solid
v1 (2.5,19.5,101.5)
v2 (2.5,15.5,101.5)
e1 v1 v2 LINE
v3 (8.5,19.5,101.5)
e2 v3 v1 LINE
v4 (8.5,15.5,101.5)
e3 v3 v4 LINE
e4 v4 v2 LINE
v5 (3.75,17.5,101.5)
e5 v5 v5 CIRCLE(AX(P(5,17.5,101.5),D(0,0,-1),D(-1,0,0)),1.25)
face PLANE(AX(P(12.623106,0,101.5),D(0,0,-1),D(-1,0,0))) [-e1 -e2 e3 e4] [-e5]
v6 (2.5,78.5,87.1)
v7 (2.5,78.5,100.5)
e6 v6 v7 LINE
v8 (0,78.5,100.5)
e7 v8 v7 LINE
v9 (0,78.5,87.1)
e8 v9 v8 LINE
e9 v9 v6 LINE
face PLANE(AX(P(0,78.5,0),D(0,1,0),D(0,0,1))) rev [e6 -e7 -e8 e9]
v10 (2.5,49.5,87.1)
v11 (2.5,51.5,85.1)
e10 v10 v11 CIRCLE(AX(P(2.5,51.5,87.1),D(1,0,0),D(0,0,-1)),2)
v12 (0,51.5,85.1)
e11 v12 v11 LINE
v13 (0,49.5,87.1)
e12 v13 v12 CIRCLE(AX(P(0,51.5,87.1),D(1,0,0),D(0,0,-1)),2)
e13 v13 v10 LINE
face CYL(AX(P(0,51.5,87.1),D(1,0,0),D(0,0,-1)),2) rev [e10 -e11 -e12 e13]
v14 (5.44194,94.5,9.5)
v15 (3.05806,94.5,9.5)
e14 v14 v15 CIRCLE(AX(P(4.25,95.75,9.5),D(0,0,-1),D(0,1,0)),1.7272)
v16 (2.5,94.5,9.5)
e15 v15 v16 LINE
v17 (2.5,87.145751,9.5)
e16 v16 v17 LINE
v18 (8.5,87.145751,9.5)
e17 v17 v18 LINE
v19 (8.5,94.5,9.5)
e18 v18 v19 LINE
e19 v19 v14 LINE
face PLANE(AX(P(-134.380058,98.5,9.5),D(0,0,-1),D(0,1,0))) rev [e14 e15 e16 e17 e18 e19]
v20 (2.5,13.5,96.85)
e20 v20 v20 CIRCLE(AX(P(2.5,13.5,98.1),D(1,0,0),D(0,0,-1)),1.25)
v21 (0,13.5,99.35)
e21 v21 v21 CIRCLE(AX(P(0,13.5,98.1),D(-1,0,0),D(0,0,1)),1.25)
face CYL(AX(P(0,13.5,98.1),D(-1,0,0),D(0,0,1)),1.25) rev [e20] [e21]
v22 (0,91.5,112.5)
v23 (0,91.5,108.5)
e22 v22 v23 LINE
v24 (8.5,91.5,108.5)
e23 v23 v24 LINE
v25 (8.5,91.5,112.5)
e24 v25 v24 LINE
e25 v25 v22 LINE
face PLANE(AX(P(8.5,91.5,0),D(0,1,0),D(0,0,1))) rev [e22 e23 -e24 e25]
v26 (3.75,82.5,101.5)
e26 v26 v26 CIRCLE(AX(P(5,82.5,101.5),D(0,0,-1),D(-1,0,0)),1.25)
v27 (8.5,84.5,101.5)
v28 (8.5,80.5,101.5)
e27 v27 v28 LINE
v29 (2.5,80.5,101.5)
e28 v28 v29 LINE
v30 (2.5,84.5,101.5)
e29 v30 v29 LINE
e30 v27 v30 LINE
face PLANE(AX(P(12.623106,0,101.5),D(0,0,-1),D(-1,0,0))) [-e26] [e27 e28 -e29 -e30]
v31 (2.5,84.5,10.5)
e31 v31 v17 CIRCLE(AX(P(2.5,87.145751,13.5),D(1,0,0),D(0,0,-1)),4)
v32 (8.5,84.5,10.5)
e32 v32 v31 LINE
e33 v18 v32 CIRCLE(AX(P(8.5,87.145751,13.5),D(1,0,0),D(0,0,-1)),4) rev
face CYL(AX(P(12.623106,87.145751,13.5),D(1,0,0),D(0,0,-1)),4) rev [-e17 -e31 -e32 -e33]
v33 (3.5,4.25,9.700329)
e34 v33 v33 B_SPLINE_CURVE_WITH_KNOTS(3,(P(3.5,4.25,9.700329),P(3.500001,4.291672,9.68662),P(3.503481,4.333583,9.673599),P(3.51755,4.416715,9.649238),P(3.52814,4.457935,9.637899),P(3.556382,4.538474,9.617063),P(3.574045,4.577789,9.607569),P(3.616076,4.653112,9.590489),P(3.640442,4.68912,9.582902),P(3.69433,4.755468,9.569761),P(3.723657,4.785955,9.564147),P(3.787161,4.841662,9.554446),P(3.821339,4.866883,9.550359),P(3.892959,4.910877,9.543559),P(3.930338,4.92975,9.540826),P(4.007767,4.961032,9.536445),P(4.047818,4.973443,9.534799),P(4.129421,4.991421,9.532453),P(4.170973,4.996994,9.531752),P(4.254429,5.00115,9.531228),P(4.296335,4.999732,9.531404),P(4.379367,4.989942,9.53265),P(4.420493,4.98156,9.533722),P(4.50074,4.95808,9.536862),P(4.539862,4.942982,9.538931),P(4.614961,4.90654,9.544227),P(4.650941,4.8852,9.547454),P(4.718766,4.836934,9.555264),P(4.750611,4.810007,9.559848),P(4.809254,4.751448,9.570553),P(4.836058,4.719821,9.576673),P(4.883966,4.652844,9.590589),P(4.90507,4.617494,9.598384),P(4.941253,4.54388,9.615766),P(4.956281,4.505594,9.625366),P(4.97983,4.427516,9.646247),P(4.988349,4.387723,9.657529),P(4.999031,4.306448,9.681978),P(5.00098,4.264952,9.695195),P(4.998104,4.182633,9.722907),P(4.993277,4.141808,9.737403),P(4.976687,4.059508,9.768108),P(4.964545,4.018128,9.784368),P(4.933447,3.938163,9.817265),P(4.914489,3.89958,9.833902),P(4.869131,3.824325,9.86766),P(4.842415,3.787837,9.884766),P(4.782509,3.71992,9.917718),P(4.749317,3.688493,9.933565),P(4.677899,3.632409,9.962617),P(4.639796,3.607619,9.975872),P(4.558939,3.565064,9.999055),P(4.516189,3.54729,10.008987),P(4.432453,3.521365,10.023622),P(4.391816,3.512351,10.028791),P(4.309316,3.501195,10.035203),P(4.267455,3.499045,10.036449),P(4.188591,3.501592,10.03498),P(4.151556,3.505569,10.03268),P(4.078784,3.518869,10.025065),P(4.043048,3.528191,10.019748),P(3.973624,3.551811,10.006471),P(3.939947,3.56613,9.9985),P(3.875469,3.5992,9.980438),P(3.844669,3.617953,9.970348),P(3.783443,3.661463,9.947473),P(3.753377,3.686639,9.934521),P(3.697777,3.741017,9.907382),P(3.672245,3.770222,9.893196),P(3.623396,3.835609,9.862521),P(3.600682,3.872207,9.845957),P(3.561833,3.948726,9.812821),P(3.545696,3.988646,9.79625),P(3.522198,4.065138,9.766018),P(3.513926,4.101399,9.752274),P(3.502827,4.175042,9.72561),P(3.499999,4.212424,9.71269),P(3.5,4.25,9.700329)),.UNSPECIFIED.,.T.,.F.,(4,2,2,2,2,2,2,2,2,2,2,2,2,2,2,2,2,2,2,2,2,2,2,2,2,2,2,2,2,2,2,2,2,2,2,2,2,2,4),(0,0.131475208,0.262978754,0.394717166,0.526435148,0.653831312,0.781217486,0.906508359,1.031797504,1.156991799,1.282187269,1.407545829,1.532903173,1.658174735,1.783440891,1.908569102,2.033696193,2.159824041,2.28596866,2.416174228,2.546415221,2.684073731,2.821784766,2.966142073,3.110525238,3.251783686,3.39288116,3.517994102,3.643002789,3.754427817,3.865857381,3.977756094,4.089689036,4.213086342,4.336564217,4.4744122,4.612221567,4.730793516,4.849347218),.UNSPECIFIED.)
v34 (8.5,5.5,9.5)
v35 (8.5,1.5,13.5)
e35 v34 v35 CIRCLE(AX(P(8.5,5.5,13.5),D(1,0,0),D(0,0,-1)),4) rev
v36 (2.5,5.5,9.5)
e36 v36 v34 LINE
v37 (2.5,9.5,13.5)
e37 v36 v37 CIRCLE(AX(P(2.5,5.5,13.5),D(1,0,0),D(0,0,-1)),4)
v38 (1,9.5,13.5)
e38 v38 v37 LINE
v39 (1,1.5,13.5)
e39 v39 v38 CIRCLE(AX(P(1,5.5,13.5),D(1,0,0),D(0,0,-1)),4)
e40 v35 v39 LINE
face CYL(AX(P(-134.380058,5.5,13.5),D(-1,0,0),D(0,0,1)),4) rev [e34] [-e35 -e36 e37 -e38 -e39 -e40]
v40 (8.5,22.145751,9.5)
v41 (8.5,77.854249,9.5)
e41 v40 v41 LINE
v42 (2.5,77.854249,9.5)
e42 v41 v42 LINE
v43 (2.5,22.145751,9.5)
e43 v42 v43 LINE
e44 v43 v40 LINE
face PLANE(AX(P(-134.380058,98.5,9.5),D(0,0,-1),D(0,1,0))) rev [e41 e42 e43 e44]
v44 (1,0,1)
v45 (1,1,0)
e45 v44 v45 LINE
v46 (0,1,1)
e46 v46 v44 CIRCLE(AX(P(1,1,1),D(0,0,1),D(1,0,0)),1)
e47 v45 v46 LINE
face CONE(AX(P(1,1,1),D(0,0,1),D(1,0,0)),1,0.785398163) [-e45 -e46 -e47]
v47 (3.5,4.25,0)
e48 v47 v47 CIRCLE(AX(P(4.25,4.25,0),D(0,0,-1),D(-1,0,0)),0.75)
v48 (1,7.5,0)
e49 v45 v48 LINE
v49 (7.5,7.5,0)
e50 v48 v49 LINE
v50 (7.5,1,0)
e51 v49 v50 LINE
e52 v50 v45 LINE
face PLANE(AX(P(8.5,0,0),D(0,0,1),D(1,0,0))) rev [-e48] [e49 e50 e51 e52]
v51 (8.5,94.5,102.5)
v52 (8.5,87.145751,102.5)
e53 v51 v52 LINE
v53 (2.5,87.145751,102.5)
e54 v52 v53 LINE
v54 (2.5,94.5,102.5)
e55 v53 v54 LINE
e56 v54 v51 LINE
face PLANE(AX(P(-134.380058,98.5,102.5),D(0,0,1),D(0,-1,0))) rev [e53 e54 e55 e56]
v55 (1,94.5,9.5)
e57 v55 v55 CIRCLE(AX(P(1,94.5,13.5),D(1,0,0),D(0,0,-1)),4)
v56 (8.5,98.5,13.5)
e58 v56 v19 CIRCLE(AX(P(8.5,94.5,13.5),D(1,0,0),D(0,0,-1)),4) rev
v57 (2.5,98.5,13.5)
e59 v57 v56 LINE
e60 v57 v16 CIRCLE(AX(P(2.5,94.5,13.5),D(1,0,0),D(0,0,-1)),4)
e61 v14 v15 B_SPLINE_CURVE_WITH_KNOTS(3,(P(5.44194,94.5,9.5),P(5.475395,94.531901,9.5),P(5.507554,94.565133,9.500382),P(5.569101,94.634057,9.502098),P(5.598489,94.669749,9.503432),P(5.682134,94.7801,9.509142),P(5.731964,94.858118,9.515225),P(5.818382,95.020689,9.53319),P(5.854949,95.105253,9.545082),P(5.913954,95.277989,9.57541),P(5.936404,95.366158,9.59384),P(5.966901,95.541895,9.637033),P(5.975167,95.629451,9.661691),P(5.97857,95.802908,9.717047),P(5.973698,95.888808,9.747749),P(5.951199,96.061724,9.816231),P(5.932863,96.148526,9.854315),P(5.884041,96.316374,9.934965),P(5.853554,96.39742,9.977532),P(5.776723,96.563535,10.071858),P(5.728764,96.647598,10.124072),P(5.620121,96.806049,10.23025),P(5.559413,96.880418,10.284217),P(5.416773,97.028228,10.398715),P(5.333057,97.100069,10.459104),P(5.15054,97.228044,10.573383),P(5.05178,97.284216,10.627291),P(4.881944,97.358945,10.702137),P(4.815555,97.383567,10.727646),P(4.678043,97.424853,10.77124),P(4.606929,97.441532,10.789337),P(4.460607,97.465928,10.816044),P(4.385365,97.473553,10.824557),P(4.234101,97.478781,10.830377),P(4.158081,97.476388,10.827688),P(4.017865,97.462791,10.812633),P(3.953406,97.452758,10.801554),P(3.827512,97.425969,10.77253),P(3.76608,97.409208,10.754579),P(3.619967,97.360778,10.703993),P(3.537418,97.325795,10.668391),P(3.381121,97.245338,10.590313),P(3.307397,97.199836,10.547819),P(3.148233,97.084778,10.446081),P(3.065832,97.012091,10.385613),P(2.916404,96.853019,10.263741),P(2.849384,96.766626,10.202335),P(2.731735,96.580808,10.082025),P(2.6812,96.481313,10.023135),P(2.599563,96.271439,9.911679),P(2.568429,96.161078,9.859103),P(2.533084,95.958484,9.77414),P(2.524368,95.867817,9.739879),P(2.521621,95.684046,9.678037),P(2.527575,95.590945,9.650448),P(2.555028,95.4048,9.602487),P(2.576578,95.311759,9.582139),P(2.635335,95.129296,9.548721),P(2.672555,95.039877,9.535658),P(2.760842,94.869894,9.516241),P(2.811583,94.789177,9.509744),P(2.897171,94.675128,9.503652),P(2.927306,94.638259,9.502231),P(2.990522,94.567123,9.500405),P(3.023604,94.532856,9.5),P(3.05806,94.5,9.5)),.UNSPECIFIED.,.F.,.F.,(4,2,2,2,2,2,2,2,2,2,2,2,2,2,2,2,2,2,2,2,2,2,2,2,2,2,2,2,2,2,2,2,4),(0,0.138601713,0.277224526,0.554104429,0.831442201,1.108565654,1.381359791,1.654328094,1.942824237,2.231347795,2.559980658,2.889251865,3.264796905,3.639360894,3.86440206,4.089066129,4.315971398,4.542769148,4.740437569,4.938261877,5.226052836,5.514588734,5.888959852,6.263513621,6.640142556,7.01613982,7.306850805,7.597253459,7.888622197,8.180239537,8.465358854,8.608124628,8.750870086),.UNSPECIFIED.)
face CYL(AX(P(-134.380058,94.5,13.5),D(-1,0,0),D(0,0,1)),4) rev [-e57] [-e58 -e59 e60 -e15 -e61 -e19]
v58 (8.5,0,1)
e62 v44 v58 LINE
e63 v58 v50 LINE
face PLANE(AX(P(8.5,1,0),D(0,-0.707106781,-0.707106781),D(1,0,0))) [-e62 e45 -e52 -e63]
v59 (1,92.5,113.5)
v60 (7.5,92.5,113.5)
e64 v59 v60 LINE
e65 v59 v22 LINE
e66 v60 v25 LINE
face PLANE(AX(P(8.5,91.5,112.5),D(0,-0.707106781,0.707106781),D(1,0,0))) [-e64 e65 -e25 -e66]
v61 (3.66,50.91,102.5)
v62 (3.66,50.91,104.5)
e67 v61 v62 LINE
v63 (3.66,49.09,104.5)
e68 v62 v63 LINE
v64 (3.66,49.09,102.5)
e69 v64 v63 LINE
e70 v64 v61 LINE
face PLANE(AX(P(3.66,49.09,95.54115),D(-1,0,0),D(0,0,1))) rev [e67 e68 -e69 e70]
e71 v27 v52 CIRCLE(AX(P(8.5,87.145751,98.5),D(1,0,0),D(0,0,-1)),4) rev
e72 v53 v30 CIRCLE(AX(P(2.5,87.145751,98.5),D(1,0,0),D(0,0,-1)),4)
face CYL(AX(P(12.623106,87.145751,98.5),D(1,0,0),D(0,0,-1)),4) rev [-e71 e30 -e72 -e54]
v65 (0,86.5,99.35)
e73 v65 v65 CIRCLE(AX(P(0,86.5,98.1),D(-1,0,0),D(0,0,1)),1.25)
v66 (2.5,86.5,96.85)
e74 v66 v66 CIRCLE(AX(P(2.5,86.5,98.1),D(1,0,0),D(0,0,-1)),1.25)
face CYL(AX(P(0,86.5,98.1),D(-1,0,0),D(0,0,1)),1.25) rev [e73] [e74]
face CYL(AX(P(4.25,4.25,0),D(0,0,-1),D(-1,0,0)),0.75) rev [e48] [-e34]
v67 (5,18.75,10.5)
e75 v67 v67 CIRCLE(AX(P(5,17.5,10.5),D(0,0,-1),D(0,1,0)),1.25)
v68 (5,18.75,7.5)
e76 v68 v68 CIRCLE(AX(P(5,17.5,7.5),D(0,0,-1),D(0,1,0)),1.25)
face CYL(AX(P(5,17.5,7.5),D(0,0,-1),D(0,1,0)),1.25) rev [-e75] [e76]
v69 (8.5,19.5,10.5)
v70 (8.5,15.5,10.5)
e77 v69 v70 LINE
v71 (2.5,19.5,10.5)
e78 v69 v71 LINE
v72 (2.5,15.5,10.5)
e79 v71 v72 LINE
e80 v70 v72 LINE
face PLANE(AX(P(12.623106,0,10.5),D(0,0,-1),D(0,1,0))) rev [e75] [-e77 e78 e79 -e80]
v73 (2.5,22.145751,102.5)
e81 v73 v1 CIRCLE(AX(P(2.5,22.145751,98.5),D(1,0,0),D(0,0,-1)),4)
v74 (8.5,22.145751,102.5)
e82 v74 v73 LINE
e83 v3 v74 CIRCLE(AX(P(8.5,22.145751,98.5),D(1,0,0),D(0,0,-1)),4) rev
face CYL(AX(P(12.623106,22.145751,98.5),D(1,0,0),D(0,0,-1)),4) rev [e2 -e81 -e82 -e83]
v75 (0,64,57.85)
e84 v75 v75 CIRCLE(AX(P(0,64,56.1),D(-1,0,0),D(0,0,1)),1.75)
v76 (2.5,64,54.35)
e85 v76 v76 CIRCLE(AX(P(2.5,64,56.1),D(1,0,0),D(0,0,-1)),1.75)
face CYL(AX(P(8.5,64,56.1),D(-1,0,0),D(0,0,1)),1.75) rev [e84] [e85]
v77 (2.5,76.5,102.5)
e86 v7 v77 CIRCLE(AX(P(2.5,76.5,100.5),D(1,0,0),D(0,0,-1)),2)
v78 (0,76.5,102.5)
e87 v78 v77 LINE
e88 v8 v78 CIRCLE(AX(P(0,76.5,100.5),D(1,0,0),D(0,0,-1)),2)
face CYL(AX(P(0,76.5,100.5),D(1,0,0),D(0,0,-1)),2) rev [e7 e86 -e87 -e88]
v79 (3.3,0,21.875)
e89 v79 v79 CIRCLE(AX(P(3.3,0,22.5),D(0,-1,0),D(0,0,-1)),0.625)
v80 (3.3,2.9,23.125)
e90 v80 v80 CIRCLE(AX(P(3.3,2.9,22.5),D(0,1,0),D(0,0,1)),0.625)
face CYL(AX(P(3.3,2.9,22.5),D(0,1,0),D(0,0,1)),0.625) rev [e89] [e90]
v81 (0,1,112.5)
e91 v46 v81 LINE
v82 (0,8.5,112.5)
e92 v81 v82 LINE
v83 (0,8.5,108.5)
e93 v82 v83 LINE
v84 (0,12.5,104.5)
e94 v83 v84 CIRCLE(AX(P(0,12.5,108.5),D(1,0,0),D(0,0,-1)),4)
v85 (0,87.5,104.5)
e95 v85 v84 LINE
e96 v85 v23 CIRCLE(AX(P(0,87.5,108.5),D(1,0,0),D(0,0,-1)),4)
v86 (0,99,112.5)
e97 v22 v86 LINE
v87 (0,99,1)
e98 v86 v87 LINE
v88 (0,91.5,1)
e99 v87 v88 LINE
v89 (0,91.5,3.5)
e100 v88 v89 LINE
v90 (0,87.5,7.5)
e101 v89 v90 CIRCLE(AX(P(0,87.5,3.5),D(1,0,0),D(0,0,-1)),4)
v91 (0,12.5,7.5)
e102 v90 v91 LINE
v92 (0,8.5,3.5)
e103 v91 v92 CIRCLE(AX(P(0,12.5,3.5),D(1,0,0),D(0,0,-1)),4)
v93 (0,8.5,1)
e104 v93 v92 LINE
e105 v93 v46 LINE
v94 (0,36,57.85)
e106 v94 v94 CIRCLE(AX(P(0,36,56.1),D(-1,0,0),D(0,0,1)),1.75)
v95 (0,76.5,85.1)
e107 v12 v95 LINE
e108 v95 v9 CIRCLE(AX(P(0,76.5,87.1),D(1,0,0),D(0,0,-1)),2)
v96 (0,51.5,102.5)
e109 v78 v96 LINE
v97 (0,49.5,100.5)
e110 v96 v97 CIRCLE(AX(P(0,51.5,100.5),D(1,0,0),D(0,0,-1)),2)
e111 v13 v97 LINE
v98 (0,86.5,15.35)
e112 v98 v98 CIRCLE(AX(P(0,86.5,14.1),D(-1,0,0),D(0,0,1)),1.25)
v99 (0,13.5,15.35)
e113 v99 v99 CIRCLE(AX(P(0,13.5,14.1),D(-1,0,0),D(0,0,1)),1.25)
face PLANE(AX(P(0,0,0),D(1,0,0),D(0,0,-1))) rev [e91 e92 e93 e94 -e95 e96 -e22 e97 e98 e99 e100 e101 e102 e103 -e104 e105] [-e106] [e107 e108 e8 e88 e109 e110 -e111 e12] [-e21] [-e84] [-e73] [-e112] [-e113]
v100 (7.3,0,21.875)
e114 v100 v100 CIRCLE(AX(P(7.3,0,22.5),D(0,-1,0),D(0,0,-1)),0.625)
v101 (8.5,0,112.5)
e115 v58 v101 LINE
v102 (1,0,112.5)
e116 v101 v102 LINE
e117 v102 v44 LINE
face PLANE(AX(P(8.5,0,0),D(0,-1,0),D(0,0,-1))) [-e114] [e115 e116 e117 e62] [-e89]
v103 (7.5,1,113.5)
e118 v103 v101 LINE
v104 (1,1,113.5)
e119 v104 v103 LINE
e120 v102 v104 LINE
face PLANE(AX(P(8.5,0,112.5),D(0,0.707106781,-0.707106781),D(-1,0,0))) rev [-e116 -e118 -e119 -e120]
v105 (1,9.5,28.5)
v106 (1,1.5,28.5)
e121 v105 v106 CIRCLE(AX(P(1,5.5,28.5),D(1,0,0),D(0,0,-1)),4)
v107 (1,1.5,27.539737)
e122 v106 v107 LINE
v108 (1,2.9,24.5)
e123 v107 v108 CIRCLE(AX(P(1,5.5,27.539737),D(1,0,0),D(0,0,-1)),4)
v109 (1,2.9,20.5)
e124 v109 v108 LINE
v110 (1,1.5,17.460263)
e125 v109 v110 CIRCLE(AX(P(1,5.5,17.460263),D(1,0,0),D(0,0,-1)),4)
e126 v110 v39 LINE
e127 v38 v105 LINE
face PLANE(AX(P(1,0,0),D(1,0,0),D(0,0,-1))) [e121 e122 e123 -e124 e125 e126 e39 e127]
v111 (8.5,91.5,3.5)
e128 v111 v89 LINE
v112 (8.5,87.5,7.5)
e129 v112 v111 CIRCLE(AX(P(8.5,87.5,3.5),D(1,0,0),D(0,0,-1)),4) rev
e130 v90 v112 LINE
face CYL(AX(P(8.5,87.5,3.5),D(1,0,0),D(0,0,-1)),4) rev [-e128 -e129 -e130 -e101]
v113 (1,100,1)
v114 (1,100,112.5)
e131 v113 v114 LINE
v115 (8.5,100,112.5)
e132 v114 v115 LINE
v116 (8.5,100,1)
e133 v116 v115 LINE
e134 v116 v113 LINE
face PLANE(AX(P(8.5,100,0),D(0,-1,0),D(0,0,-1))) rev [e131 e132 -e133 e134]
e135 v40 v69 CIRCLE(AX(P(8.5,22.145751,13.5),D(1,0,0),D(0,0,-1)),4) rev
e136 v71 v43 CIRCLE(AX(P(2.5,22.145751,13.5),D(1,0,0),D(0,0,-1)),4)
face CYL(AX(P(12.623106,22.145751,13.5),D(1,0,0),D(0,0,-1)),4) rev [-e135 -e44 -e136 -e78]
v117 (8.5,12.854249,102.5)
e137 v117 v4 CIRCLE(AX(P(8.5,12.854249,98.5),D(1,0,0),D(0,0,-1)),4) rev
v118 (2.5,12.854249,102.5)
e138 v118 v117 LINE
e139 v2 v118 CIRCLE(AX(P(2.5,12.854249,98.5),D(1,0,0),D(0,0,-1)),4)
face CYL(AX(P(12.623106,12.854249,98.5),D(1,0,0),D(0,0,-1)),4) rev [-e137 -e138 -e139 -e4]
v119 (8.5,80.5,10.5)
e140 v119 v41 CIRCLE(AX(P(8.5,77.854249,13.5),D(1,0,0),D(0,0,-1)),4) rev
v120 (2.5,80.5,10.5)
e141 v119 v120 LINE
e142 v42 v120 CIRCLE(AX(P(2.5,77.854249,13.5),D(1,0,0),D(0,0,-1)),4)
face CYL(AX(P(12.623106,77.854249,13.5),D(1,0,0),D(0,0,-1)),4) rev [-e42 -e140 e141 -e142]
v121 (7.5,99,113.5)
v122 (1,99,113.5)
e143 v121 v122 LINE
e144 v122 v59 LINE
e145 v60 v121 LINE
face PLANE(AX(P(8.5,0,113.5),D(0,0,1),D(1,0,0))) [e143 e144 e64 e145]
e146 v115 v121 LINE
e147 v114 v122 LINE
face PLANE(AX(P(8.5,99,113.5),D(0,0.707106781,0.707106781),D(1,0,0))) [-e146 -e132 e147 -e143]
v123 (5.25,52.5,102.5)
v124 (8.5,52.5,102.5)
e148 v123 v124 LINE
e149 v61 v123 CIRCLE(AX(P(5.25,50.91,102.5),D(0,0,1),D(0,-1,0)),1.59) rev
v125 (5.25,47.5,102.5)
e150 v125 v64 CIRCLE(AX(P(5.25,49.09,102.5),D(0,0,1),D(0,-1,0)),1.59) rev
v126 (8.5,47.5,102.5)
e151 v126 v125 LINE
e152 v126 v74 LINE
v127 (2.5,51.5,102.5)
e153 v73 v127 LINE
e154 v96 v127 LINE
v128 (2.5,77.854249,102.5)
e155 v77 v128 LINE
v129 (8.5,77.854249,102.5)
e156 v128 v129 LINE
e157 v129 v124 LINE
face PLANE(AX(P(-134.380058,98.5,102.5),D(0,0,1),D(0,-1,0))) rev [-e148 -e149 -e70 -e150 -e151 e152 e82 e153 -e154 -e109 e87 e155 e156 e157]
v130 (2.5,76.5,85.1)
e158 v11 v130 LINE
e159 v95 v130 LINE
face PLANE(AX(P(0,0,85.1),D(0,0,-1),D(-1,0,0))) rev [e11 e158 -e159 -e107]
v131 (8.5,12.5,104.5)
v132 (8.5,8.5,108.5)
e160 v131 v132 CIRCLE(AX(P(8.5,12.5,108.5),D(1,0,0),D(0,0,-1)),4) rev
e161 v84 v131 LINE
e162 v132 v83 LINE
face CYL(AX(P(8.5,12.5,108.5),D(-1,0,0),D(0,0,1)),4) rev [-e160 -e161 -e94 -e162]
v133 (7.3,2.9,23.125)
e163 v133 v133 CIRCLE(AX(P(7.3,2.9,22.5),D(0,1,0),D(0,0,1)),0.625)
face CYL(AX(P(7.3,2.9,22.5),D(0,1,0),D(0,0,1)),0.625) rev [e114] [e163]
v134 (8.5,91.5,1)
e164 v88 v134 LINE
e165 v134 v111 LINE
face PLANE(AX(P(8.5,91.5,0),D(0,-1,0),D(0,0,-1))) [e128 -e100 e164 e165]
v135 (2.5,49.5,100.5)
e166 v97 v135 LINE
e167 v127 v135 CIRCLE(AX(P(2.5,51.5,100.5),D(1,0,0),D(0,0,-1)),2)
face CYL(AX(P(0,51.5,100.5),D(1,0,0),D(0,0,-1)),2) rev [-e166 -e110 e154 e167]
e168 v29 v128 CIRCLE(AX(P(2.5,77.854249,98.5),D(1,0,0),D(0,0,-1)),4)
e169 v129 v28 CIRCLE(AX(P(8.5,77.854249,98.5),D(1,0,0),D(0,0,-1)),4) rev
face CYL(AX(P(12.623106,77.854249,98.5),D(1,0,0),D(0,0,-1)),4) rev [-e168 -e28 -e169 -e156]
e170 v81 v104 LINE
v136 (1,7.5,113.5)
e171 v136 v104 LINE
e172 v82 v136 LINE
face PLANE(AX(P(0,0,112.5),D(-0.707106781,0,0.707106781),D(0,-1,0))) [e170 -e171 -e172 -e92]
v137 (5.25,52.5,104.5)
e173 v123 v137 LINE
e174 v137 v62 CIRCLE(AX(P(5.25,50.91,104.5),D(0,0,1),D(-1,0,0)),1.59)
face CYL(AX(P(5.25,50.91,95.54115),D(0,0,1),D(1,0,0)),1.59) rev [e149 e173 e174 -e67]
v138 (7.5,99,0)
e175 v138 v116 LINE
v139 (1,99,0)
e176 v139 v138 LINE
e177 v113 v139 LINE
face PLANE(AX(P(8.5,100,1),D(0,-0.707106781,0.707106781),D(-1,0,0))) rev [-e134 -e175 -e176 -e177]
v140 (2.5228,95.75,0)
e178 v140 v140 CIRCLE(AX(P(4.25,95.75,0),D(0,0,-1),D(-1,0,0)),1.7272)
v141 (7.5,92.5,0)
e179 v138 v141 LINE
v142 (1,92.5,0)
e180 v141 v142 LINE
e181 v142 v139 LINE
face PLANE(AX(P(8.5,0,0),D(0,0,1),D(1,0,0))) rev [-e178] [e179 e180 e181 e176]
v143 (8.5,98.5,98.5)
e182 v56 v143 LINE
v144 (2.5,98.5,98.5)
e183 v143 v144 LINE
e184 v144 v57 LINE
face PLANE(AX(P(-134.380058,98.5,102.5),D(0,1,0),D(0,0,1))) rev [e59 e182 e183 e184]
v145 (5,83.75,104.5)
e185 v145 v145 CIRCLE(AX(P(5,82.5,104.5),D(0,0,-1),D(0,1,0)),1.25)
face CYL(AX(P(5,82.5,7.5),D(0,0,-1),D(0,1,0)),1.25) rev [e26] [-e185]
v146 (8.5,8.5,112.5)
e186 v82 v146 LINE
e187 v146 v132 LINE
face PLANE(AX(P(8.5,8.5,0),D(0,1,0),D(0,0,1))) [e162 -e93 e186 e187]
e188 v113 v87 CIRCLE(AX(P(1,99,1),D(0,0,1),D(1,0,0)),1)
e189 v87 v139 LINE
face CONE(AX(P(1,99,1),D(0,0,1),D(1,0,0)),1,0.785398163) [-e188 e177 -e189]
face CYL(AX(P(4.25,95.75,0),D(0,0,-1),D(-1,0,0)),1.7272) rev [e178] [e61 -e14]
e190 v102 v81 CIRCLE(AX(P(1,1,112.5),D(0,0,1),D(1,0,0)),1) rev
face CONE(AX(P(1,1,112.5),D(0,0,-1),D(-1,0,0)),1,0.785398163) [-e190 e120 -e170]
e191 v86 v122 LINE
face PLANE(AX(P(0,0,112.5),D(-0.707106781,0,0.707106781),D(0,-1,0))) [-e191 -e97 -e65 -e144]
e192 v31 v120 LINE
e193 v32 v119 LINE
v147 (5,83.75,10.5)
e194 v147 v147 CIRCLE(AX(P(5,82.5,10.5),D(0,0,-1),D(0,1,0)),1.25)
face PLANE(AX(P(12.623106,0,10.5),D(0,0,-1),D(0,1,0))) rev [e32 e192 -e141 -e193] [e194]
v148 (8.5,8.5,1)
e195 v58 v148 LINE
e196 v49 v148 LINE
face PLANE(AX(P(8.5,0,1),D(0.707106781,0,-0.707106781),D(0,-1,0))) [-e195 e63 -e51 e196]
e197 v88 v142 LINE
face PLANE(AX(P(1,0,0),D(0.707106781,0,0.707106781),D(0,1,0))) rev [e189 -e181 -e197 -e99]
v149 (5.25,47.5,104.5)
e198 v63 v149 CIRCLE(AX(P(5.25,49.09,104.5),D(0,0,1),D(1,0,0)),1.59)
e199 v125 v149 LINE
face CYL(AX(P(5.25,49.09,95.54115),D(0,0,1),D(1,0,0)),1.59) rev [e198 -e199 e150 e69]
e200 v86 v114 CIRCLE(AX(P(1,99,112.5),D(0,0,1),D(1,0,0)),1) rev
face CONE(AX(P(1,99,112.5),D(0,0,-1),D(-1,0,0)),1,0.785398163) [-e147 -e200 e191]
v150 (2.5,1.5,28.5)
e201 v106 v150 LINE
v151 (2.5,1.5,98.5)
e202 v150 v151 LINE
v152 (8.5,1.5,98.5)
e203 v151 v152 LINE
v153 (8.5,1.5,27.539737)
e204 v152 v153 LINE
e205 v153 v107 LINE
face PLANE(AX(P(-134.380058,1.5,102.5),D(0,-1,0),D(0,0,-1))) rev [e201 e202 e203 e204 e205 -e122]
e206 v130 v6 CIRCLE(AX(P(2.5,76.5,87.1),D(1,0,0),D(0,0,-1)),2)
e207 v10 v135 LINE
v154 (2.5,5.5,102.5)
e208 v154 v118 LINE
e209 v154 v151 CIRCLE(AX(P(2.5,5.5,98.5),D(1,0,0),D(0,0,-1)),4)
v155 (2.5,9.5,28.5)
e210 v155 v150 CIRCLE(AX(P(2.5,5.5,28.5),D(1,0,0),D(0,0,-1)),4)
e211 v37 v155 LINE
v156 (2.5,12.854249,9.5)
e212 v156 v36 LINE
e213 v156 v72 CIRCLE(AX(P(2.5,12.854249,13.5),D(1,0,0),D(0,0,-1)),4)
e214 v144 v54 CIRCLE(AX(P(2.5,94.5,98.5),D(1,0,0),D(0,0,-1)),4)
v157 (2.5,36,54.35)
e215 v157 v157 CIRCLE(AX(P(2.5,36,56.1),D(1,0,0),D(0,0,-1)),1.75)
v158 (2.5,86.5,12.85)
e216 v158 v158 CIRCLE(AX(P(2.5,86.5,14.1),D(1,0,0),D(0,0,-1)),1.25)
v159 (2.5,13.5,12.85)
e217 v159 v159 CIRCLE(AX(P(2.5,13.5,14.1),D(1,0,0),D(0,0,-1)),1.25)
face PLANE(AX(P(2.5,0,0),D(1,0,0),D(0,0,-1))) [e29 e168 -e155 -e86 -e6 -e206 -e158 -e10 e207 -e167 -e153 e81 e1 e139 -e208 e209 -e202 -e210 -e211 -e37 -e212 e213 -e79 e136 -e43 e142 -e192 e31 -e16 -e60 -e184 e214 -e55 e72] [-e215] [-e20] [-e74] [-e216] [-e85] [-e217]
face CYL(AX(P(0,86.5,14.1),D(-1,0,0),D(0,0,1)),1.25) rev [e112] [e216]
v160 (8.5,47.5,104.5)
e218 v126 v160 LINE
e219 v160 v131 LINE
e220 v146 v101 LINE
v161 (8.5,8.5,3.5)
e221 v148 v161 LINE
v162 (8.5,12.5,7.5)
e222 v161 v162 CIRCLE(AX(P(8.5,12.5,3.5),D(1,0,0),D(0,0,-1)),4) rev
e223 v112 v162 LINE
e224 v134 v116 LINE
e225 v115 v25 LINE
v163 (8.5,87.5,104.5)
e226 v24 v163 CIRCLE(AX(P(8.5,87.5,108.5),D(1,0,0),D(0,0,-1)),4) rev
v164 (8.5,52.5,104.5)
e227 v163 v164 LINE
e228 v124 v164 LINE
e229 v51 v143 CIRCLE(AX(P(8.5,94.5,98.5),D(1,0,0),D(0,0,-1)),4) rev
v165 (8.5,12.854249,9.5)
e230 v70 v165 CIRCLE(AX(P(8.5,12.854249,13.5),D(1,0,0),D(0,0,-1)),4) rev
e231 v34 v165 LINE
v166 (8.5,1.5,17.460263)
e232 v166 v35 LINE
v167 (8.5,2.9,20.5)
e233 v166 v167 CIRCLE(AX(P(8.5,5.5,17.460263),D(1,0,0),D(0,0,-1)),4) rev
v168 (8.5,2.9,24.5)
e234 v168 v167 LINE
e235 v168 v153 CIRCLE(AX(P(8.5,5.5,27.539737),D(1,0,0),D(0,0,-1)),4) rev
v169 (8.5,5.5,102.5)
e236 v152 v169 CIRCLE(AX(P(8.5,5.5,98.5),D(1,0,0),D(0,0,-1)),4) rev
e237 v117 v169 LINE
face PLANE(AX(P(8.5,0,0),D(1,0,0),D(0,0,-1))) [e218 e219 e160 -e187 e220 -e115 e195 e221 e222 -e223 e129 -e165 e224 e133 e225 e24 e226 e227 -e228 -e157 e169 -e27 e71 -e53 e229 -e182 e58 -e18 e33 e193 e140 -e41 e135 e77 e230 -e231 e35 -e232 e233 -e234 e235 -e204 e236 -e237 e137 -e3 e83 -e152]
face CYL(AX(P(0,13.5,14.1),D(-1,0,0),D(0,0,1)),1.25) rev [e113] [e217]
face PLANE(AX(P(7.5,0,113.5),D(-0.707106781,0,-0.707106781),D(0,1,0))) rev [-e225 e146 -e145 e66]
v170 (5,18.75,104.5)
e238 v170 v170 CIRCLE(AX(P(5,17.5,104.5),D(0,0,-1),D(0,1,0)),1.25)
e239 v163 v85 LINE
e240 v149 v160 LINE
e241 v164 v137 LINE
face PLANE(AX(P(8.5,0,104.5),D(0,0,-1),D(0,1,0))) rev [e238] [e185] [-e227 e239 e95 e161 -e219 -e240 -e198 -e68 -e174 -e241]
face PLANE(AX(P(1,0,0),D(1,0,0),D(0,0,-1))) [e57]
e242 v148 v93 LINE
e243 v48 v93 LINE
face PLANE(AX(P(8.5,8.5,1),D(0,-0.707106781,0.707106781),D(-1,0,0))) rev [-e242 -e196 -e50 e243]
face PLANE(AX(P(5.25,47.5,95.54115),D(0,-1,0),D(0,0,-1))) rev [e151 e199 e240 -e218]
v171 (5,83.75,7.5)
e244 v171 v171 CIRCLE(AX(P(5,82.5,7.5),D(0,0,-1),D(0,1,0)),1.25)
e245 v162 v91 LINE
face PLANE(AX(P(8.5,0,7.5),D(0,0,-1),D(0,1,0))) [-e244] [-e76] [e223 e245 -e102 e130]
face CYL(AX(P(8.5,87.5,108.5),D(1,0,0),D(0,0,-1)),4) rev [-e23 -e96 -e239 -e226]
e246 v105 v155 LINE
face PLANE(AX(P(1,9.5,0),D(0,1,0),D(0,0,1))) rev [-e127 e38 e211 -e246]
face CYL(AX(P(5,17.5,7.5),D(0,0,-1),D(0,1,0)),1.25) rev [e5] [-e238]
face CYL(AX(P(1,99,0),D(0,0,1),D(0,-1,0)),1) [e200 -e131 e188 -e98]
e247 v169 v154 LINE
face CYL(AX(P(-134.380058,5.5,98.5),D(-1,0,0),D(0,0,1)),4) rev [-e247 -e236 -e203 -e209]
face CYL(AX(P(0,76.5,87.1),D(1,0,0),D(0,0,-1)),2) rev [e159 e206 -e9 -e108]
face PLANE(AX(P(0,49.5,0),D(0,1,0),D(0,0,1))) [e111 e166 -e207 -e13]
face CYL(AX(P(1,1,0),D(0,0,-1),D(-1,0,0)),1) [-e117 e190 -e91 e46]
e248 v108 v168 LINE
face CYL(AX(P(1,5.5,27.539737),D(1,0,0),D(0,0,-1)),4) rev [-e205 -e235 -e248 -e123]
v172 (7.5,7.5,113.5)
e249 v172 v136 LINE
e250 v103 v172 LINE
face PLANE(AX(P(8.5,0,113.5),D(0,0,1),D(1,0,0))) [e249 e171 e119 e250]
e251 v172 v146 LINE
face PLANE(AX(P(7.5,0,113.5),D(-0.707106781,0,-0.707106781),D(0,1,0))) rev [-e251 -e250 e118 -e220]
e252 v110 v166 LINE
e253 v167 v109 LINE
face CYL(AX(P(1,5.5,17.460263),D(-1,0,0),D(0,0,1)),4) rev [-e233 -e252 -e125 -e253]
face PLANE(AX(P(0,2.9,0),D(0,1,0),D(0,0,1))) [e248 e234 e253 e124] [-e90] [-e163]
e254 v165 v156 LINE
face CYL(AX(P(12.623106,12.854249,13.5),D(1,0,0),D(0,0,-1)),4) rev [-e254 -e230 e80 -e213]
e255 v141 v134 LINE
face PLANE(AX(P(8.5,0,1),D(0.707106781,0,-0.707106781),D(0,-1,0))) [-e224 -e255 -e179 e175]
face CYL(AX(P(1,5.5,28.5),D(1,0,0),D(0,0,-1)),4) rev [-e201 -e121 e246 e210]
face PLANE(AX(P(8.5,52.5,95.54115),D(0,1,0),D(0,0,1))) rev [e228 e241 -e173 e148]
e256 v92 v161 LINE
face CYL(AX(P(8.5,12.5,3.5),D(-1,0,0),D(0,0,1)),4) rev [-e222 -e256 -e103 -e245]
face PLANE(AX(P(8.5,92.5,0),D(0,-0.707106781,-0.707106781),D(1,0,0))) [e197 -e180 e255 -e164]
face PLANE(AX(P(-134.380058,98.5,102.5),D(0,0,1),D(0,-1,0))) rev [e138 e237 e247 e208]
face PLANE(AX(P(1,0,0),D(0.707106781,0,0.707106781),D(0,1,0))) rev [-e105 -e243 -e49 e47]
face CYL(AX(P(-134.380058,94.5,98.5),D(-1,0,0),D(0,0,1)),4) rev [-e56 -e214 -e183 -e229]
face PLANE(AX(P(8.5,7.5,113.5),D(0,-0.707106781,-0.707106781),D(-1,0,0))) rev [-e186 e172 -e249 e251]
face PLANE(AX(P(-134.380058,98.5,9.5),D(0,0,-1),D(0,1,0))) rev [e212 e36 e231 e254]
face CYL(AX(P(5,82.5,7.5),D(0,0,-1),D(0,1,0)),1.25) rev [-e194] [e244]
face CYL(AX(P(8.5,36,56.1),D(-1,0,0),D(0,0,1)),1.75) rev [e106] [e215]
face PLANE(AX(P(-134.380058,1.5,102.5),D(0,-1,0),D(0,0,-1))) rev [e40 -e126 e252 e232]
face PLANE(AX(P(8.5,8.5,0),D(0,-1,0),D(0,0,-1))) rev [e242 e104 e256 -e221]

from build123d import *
from build123d.topology import SkipClean

# Parameters (mm, degrees)
SKETCH1_W                    = 81
SKETCH1_H                    = 83
BODY_DEPTH                   = 8.5
RAILFILLET_R                 = 1
FOOTCHAMFER_SIZE             = 1
SKETCH5_W                    = 81
SKETCH5_H                    = 83
BOSS_EXTRUDE3_DEPTH          = 8.5
SKETCH6_W                    = 93
SKETCH6_H                    = 97
CUT_EXTRUDE3_DEPTH           = 6
F_8_36_TAPPED_HOLE1_D        = 3.4544
F_8_36_TAPPED_HOLE1_DEPTH    = 13.55
F_8_36_TAPPED_HOLE1_TIP      = 1.037806461
SKETCH57_W                   = 1
SKETCH57_H                   = 4
BOSS_EXTRUDE24_DEPTH         = 6
FILLET5_R                    = 4
M3X0_5_TAPPED_HOLE1_D        = 2.5
FILLET7_R                    = 4
M3X0_5_TAPPED_HOLE2_D        = 2.5
M3X0_5_TAPPED_HOLE2_DEPTH    = 7.5
M3X0_5_TAPPED_HOLE2_TIP      = 0.751075774
FILLET8_R                    = 4
SKETCH70_R                   = 4
CUT_EXTRUDE14_DEPTH          = 1.5
SKETCH75_W                   = 7.5
SKETCH75_H                   = 4
BOSS_EXTRUDE25_DEPTH         = 1.4
M1_6X0_35_TAPPED_HOLE1_D     = 1.25
M1_6X0_35_TAPPED_HOLE1_DEPTH = 4.25
M1_6X0_35_TAPPED_HOLE1_TIP   = 0.375537887
FILLET9_R                    = 4
F_1_5MM_DOWEL_HOLE1_REACH    = 153.507
F_1_5MM_DOWEL_HOLE1_BORE_R   = 0.75
CUT_EXTRUDE15_DEPTH          = 152.387747196
SKETCH84_R                   = 1.75
CUT_EXTRUDE17_DEPTH          = 152.507425566
CUT_EXTRUDE18_DEPTH          = 2


# Some blends are built 0.0001 mm under size
with BuildPart() as part:
    # Sketch1 → Body (new body)
    with BuildSketch(Plane(origin=(0, 0, 0), x_dir=(0, 0, -1), z_dir=(1, 0, 0))):
        Polygon((-113.5, 0), (0, 0), (0, 8.5), (-7.5, 8.5), (-7.5, 91.5), (0, 91.5), (0, 100), (-113.5, 100), (-113.5, 91.5), (-104.5, 91.5), (-104.5, 8.5), (-113.5, 8.5), align=None)
        with Locations((-56, 50)):
            Rectangle(SKETCH1_W, SKETCH1_H, mode=Mode.SUBTRACT)
    extrude(amount=BODY_DEPTH)

    # RailFillet
    railfillet_edges = [part.edges().sort_by_distance(p)[0] for p in [
        (0, 0, 56.75),
        (0, 100, 56.75),
    ]]
    fillet(railfillet_edges, radius=RAILFILLET_R)

    # FootChamfer
    footchamfer_edges = [part.edges().sort_by_distance(p)[0] for p in [
        (8.5, 95.75, 0),
        (0, 95.25, 113.5),
        (8.5, 95.75, 113.5),
        (0, 95.25, 0),
        (4.25, 8.5, 0),
        (4.75, 0, 0),
        (4.75, 0, 113.5),
        (4.25, 8.5, 113.5),
        (4.25, 91.5, 113.5),
        (4.75, 100, 113.5),
        (4.75, 100, 0),
        (4.25, 91.5, 0),
        (8.5, 4.25, 113.5),
        (8.5, 4.25, 0),
        (0, 4.75, 0),
        (0, 4.75, 113.5),
        (0.292893219, 0.292893219, 113.5),
        (0.292893219, 0.292893219, 0),
        (0.292893219, 99.707106781, 113.5),
        (0.292893219, 99.707106781, 0),
    ]]
    chamfer(footchamfer_edges, length=FOOTCHAMFER_SIZE - 0.0001)  # a hair under: the kernel refuses the full size

    # Sketch5 → Boss-Extrude3 (add)
    with BuildSketch(Plane(origin=(8.5, 0, 0), x_dir=(0, 0, -1), z_dir=(1, 0, 0))):
        with Locations((-56, 50)):
            Rectangle(SKETCH5_W, SKETCH5_H)
    extrude(amount=-BOSS_EXTRUDE3_DEPTH)

    # Sketch6 → Cut-Extrude3 (cut)
    with BuildSketch(Plane(origin=(8.5, 0, 0), x_dir=(0, 0, -1), z_dir=(1, 0, 0))):
        with Locations((-56, 50)):
            Rectangle(SKETCH6_W, SKETCH6_H)
    extrude(amount=-CUT_EXTRUDE3_DEPTH, mode=Mode.SUBTRACT)

    # #8-36 Tapped Hole1
    with Locations(Plane(origin=(0, 0, 0), x_dir=(-1, 0, 0), z_dir=(0, 0, -1))):
        with Locations((-4.25, 95.75)):
            Hole(F_8_36_TAPPED_HOLE1_D / 2, depth=F_8_36_TAPPED_HOLE1_DEPTH)
            with Locations((0, 0, -(F_8_36_TAPPED_HOLE1_DEPTH + F_8_36_TAPPED_HOLE1_TIP / 2))):  # 118° drill point
                Cone(0, F_8_36_TAPPED_HOLE1_D / 2, F_8_36_TAPPED_HOLE1_TIP, mode=Mode.SUBTRACT)

    # Sketch57 → Boss-Extrude24 (add)
    with BuildSketch(Plane(origin=(2.5, 0, 0), x_dir=(0, 0, -1), z_dir=(1, 0, 0))):
        with Locations((-102, 82.5)):
            Rectangle(SKETCH57_W, SKETCH57_H)
        with Locations((-102, 17.5)):
            Rectangle(SKETCH57_W, SKETCH57_H)
        with Locations((-10, 17.5)):
            Rectangle(SKETCH57_W, SKETCH57_H)
        with Locations((-10, 82.5)):
            Rectangle(SKETCH57_W, SKETCH57_H)
    extrude(amount=BOSS_EXTRUDE24_DEPTH)

    # Fillet5
    # the kernel refuses this fillet: 4 mm, written as the material it adds along each edge
    with BuildSketch(Plane(origin=(2.5, 84.5, 102.5), x_dir=(0, 1, 0), z_dir=(1, 0, 0)), Plane(origin=(2.5, 19.5, 102.5), x_dir=(0, 1, 0), z_dir=(1, 0, 0)), Plane(origin=(2.5, 15.5, 9.5), x_dir=(0, -1, 0), z_dir=(1, 0, 0)), Plane(origin=(2.5, 80.5, 9.5), x_dir=(0, -1, 0), z_dir=(1, 0, 0))) as fillet5_piece_1:
        with BuildLine():
            CenterArc((2.645751311, -4), FILLET5_R, 90, 41.409622109)
            Line((0, -1), (-0.052915026, -0.94))
            ThreePointArc((-0.052915026, -0.94), (-0.08, -0.5), (-0.08, 0))
            Line((-0.08, 0), (0, 0.08))
            Line((0, 0.08), (2.645751311, 0.08))
            Line((2.645751311, 0.08), (2.645751311, 0))
        make_face()
    extrude(amount=6)
    with BuildSketch(Plane(origin=(2.5, 80.5, 102.5), x_dir=(0, -1, 0), z_dir=(1, 0, 0)), Plane(origin=(2.5, 15.5, 102.5), x_dir=(0, -1, 0), z_dir=(1, 0, 0)), Plane(origin=(2.5, 19.5, 9.5), x_dir=(0, 1, 0), z_dir=(1, 0, 0)), Plane(origin=(2.5, 84.5, 9.5), x_dir=(0, 1, 0), z_dir=(1, 0, 0))) as fillet5_piece_2:
        with BuildLine():
            CenterArc((2.645751311, 4), FILLET5_R, 228.590377891, 41.409622109)
            Line((0, 1), (-0.052915026, 0.94))
            ThreePointArc((-0.052915026, 0.94), (-0.08, 0.5), (-0.08, 0))
            Line((-0.08, 0), (0, -0.08))
            Line((0, -0.08), (2.645751311, -0.08))
            Line((2.645751311, -0.08), (2.645751311, 0))
        make_face()
    extrude(amount=6)

    # M3x0.5 Tapped Hole1 (through all)
    with Locations(Plane(origin=(0, 0, 7.5), x_dir=(-1, 0, 0), z_dir=(0, 0, -1))):
        with Locations((-5, 82.5), (-5, 17.5)):
            Hole(M3X0_5_TAPPED_HOLE1_D / 2)

    # Fillet7
    # the kernel refuses this fillet: 4 mm, written as the material it adds along each edge
    with BuildSketch(Plane(origin=(8.5, 1.5, 102.5), x_dir=(0, 1, 0), z_dir=(-1, 0, 0)), Plane(origin=(8.5, 98.5, 102.5), x_dir=(0, 0, -1), z_dir=(-1, 0, 0)), Plane(origin=(8.5, 1.5, 9.5), x_dir=(0, 0, 1), z_dir=(-1, 0, 0))) as fillet7_piece_1:
        with BuildLine():
            CenterArc((FILLET7_R, FILLET7_R), FILLET7_R, 180, 90)
            Line((0, FILLET7_R), (0, 0))
            Line((0, 0), (FILLET7_R, 0))
        make_face()
    extrude(amount=6)
    with BuildSketch(Plane(origin=(8.5, 98.5, 9.5), x_dir=(0, -1, 0), z_dir=(-1, 0, 0))) as fillet7_piece_2_section:
        with BuildLine():
            CenterArc((FILLET7_R, FILLET7_R), FILLET7_R, 180, 90)
            Line((0, FILLET7_R), (0, 0))
            Line((0, 0), (FILLET7_R, 0))
        make_face()
    fillet7_piece_2 = extrude(amount=6, mode=Mode.PRIVATE)
    fillet7_piece_2 = fillet7_piece_2 - Plane(origin=(4.25, 95.75, 10.518489618), x_dir=(1, 0, 0), z_dir=(0, 0, 1)) * Cylinder(1.7272, 28, mode=Mode.PRIVATE)
    add(fillet7_piece_2)

    # M3x0.5 Tapped Hole2
    with Locations(Plane.ZY):
        with Locations((14.1, 13.5), (14.1, 86.5), (98.1, 86.5), (98.1, 13.5)):
            Hole(M3X0_5_TAPPED_HOLE2_D / 2, depth=M3X0_5_TAPPED_HOLE2_DEPTH)
            with Locations((0, 0, -(M3X0_5_TAPPED_HOLE2_DEPTH + M3X0_5_TAPPED_HOLE2_TIP / 2))):  # 118° drill point
                Cone(0, M3X0_5_TAPPED_HOLE2_D / 2, M3X0_5_TAPPED_HOLE2_TIP, mode=Mode.SUBTRACT)

    # Fillet8
    fillet8_edges = [part.edges().sort_by_distance(p)[0] for p in [
        (4.25, 8.5, 7.5),
        (4.25, 8.5, 104.5),
        (4.25, 91.5, 104.5),
        (4.25, 91.5, 7.5),
    ]]
    fillet(fillet8_edges, radius=FILLET8_R)

    # Sketch70 → Cut-Extrude14 (cut)
    with BuildSketch(Plane(origin=(2.5, 0, 0), x_dir=(0, 0, -1), z_dir=(1, 0, 0))):
        with BuildLine():
            ThreePointArc((-13.5, 1.5), (-9.5, 5.5), (-13.5, 9.5))
            Line((-13.5, 9.5), (-28.5, 9.5))
            ThreePointArc((-28.5, 9.5), (-32.5, 5.5), (-28.5, 1.5))
            Line((-28.5, 1.5), (-13.5, 1.5))
        make_face()
        with Locations((-13.5, 94.5)):
            Circle(SKETCH70_R)
    extrude(amount=-CUT_EXTRUDE14_DEPTH, mode=Mode.SUBTRACT)

    # Sketch75 → Boss-Extrude25 (add)
    with BuildSketch(Plane(origin=(0, 1.5, 0), x_dir=(1, 0, 0), z_dir=(0, 1, 0))):
        with Locations((4.75, -22.5)):
            Rectangle(SKETCH75_W, SKETCH75_H)
    extrude(amount=BOSS_EXTRUDE25_DEPTH)

    # M1.6x0.35 Tapped Hole1
    with Locations(Plane(origin=(0, 2.9, 0), x_dir=(1, 0, 0), z_dir=(0, 1, 0))):
        with Locations((3.3, -22.5), (7.3, -22.5)):
            Hole(M1_6X0_35_TAPPED_HOLE1_D / 2, depth=M1_6X0_35_TAPPED_HOLE1_DEPTH)
            with Locations((0, 0, -(M1_6X0_35_TAPPED_HOLE1_DEPTH + M1_6X0_35_TAPPED_HOLE1_TIP / 2))):  # 118° drill point
                Cone(0, M1_6X0_35_TAPPED_HOLE1_D / 2, M1_6X0_35_TAPPED_HOLE1_TIP, mode=Mode.SUBTRACT)

    # Fillet9
    # the kernel refuses this fillet: 4 mm, written as the material it adds along each edge
    with BuildSketch(Plane(origin=(8.5, 1.5, 24.5), x_dir=(0, 1, 0), z_dir=(-1, 0, 0))) as fillet9_piece_1:
        with BuildLine():
            CenterArc((4, -3.039736831), FILLET9_R, 130.541601874, 49.458398126)
            Line((0, -3.039736831), (-0.08, -3.039736831))
            Line((-0.08, -3.039736831), (-0.08, 0))
            Line((-0.08, 0), (0, 0.08))
            ThreePointArc((0, 0.08), (0.7, 0.08), (1.348, 0.060794737))
            Line((1.348, 0.060794737), (1.4, 0))
        make_face()
    extrude(amount=6)
    with BuildSketch(Plane(origin=(2.5, 1.5, 20.5), x_dir=(0, 0, -1), z_dir=(1, 0, 0))) as fillet9_piece_2:
        with BuildLine():
            CenterArc((3.039736831, 4), FILLET9_R, 220.541601874, 49.458398126)
            Line((0, 1.4), (-0.060794737, 1.348))
            ThreePointArc((-0.060794737, 1.348), (-0.08, 0.7), (-0.08, 0))
            Line((-0.08, 0), (0, -0.08))
            Line((0, -0.08), (3.039736831, -0.08))
            Line((3.039736831, -0.08), (3.039736831, 0))
        make_face()
    extrude(amount=6)
    with BuildSketch(Plane(origin=(1, 1.5, 20.5), x_dir=(0, 1, 0), z_dir=(1, 0, 0)), Plane(origin=(2.5, 1.5, 24.5), x_dir=(0, 1, 0), z_dir=(-1, 0, 0))) as fillet9_piece_3:
        with BuildLine():
            CenterArc((4, -3.039736831), FILLET9_R, 130.541601874, 49.458398126)
            Line((0, -3.039736831), (-0.08, -3.039736831))
            Line((-0.08, -3.039736831), (-0.08, 0))
            Line((-0.08, 0), (0, 0.08))
            ThreePointArc((0, 0.08), (0.7, 0.08), (1.348, 0.060794737))
            Line((1.348, 0.060794737), (1.4, 0))
        make_face()
    extrude(amount=1.5)

    # Ø1.5mm Dowel Hole1 bore → Ø1.5mm Dowel Hole1 (cut, up to next)
    with BuildSketch(Plane(origin=(0, 0, 0), x_dir=(-1, 0, 0), z_dir=(0, 0, -1)), mode=Mode.PRIVATE) as f_1_5mm_dowel_hole1_sk1:
        with Locations((-4.25, 4.25)):
            Circle(F_1_5MM_DOWEL_HOLE1_BORE_R)
    f_1_5mm_dowel_hole1_tool1 = extrude(f_1_5mm_dowel_hole1_sk1.sketch, amount=-F_1_5MM_DOWEL_HOLE1_REACH, mode=Mode.PRIVATE) & part.part
    add(f_1_5mm_dowel_hole1_tool1.solids().sort_by_distance((4.25, 4.25, 0))[0], mode=Mode.SUBTRACT)

    # Sketch81 → Cut-Extrude15 (cut, through all)
    with SkipClean():  # the faces are left unmerged after this step: merging them gives an invalid solid
        with BuildSketch(Plane(origin=(2.5, 0, 0), x_dir=(0, 0, -1), z_dir=(1, 0, 0))):
            with BuildLine():
                ThreePointArc((-102.5, 51.5), (-101.914213562, 50.085786438), (-100.5, 49.5))
                ThreePointArc((-100.5, 49.5), (-99.085786438, 50.085786438), (-98.5, 51.5))
                Line((-98.5, 51.5), (-98.5, 76.5))
                ThreePointArc((-98.5, 76.5), (-99.085786438, 77.914213562), (-100.5, 78.5))
                ThreePointArc((-100.5, 78.5), (-101.914213562, 77.914213562), (-102.5, 76.5))
                Line((-102.5, 76.5), (-102.5, 51.5))
            make_face()
            with BuildLine():
                Line((-85.1, 51.5), (-85.1, 76.5))
                ThreePointArc((-85.1, 76.5), (-87.1, 78.5), (-89.1, 76.5))
                Line((-89.1, 76.5), (-89.1, 51.5))
                ThreePointArc((-89.1, 51.5), (-87.1, 49.5), (-85.1, 51.5))
            make_face()
            with BuildLine():
                ThreePointArc((-87.1, 49.5), (-88.514213562, 50.085786438), (-89.1, 51.5))
                Line((-89.1, 51.5), (-89.1, 76.5))
                ThreePointArc((-89.1, 76.5), (-88.514213562, 77.914213562), (-87.1, 78.5))
                Line((-87.1, 78.5), (-100.5, 78.5))
                ThreePointArc((-100.5, 78.5), (-99.085786438, 77.914213562), (-98.5, 76.5))
                Line((-98.5, 76.5), (-98.5, 51.5))
                ThreePointArc((-98.5, 51.5), (-99.085786438, 50.085786438), (-100.5, 49.5))
                Line((-100.5, 49.5), (-87.1, 49.5))
            make_face()
        extrude(amount=-CUT_EXTRUDE15_DEPTH, mode=Mode.SUBTRACT)

    # Sketch84 → Cut-Extrude17 (cut, through all)
    with SkipClean():  # the faces are left unmerged after this step: merging them gives an invalid solid
        with BuildSketch(Plane.ZY):
            with Locations((56.1, 36)):
                Circle(SKETCH84_R)
            with Locations((56.1, 64)):
                Circle(SKETCH84_R)
        extrude(amount=-CUT_EXTRUDE17_DEPTH, mode=Mode.SUBTRACT)

    # Sketch85 → Cut-Extrude18 (cut)
    with BuildSketch(Plane.XY.offset(104.5)):
        with BuildLine():
            Line((5.25, 47.5), (8.5, 47.5))
            Line((8.5, 47.5), (8.5, 52.5))
            Line((8.5, 52.5), (5.25, 52.5))
            ThreePointArc((5.25, 52.5), (4.125700218, 52.034299782), (3.66, 50.91))
            Line((3.66, 50.91), (3.66, 49.09))
            ThreePointArc((3.66, 49.09), (4.125700218, 47.965700218), (5.25, 47.5))
        make_face()
    extrude(amount=-CUT_EXTRUDE18_DEPTH, mode=Mode.SUBTRACT)


solid = part.part
